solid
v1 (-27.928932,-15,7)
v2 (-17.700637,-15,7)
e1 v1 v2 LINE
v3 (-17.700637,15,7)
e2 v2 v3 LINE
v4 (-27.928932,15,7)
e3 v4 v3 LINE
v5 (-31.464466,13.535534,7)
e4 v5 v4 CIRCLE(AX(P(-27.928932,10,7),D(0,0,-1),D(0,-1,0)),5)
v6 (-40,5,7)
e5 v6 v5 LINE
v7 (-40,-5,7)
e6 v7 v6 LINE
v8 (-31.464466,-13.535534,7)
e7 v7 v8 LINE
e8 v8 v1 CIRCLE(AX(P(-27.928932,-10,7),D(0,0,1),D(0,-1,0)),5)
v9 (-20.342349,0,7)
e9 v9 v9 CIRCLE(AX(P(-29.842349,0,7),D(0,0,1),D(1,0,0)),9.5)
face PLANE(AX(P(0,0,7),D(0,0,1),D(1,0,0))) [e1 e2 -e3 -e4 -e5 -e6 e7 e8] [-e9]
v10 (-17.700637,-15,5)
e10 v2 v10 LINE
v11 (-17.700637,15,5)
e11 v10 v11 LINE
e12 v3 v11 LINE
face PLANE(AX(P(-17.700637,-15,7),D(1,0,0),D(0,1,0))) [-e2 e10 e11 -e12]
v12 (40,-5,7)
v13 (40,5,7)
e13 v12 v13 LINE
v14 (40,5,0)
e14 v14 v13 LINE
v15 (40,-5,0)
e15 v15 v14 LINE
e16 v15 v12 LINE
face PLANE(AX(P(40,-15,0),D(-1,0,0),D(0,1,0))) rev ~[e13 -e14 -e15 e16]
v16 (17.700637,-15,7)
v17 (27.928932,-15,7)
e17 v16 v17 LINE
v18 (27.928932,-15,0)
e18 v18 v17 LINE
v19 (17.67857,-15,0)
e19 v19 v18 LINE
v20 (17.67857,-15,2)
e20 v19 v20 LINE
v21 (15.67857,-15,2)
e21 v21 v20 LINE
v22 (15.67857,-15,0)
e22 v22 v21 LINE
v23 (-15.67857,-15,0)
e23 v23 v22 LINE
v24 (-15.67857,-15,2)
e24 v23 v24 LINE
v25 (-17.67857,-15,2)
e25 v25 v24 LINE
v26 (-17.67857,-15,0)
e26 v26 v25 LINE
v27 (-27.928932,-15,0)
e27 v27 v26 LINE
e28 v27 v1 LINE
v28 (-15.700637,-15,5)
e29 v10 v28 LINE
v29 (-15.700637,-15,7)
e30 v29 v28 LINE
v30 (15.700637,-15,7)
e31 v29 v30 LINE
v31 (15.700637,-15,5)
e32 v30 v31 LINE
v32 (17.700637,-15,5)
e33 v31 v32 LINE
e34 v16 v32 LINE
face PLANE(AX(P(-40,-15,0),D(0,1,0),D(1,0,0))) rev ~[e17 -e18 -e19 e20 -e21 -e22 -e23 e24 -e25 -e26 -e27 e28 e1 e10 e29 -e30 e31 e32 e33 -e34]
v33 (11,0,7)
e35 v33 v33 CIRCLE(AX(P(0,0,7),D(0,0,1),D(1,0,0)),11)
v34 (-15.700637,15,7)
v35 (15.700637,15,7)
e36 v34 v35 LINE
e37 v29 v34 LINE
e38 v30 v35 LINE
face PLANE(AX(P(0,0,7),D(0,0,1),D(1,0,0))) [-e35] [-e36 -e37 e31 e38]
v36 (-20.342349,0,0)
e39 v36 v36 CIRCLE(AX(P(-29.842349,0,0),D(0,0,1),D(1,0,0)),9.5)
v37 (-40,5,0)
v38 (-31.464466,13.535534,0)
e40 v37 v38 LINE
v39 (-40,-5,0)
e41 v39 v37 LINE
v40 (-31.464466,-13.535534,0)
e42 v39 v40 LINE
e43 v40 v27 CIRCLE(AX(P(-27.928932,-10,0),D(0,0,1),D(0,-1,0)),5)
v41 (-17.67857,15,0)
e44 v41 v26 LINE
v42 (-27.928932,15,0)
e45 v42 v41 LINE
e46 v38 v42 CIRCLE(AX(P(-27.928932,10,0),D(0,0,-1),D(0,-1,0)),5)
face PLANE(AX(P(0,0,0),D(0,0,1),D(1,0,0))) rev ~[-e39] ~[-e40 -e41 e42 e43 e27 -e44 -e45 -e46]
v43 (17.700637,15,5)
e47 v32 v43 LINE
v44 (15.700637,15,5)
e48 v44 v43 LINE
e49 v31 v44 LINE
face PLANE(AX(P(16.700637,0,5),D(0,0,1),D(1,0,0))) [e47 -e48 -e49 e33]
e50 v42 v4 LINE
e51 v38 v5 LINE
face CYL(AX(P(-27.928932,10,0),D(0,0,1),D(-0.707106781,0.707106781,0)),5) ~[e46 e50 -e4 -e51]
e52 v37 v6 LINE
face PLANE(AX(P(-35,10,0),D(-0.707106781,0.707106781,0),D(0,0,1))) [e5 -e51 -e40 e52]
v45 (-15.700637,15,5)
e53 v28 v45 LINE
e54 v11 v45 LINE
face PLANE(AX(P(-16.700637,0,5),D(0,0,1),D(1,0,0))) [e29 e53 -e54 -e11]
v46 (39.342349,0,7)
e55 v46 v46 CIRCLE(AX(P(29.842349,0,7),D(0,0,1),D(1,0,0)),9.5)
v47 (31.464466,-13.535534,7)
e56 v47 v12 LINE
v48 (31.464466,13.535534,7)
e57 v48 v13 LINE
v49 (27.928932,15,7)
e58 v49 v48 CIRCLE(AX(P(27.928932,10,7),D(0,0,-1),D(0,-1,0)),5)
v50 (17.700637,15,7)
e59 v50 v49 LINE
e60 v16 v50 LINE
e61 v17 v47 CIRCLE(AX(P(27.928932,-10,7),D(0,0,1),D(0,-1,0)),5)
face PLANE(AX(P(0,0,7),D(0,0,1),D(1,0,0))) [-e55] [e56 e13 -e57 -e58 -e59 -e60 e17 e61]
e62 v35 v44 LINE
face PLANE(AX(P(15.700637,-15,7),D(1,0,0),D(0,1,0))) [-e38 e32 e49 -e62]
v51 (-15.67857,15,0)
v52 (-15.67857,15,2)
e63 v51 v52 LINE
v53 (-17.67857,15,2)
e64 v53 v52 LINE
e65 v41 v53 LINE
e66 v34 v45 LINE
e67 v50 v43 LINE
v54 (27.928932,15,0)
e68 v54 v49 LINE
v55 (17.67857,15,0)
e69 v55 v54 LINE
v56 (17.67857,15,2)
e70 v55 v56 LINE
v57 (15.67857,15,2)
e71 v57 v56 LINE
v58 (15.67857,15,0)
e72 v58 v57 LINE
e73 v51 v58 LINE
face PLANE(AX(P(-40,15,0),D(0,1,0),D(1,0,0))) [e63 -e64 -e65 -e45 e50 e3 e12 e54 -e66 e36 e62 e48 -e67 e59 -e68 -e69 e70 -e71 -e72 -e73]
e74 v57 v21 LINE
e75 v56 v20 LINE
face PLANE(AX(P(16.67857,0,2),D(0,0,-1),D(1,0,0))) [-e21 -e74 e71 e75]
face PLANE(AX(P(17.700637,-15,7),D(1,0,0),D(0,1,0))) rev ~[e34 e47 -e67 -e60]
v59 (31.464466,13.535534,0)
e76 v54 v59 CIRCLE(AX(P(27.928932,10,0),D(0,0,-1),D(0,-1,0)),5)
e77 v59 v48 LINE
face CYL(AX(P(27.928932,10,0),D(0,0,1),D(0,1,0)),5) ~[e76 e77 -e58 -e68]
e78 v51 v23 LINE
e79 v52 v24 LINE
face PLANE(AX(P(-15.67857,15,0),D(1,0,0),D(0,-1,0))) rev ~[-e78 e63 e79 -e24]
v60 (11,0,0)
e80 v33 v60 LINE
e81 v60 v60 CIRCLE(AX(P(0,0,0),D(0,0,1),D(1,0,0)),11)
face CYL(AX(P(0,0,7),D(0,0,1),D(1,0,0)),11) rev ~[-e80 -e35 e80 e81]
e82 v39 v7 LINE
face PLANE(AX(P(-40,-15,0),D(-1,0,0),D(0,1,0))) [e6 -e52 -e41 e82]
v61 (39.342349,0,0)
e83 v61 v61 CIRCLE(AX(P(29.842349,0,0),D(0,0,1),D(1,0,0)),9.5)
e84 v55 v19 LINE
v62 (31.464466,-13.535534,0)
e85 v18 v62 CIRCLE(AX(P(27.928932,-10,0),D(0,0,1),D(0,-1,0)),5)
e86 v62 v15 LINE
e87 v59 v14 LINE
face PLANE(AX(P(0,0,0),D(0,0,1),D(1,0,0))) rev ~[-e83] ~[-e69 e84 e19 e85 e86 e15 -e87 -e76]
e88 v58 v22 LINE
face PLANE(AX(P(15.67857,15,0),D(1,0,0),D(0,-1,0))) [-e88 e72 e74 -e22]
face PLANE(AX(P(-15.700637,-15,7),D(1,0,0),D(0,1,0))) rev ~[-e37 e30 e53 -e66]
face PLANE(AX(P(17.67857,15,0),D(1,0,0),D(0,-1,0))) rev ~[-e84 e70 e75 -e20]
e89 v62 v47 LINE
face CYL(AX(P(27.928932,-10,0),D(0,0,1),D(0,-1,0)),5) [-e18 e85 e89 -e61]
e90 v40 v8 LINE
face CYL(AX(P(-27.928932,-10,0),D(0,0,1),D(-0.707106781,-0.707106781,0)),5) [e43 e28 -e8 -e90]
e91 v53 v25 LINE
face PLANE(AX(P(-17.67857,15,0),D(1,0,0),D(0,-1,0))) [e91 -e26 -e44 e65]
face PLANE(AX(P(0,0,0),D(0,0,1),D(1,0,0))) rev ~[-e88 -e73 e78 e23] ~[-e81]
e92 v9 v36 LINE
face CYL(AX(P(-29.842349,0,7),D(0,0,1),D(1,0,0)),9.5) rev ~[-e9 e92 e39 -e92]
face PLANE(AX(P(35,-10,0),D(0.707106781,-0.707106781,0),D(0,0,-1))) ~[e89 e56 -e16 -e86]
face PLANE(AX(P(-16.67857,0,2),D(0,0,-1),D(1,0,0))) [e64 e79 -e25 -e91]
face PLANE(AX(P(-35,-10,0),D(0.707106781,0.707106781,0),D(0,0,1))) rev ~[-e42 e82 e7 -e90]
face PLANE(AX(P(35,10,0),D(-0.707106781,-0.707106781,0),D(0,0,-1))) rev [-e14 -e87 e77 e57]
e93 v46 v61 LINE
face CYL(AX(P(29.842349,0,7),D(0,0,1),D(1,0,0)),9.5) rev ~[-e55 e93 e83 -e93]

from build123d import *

# Parameters (mm, degrees)
F0_W      = 80
F0_H      = 30
F1_DEPTH  = 7
F2_R      = 11
F3_DEPTH  = 7.001
F4_SIZE   = 10
F5_R      = 5
F6_R      = 9.5
F7_DEPTH  = 7.001
F8_W      = 2
F8_H      = 30
F9_DEPTH  = 2
F10_W     = 2
F10_H     = 30
F11_DEPTH = 2


with BuildPart() as f1:
    # F0 (on Top) → F1 (new body)
    with BuildSketch(Plane.XY):
        Rectangle(F0_W, F0_H)
    extrude(amount=F1_DEPTH)

    # F2 (on face) → F3 (cut, through all)
    with BuildSketch(Plane.XY.offset(7)):
        Circle(F2_R)
    extrude(amount=-F3_DEPTH, mode=Mode.SUBTRACT)

    # F4
    f4_edges = [f1.edges().sort_by_distance(p)[0] for p in [
        (-40, 15, 3.5),
        (40, -15, 3.5),
        (40, 15, 3.5),
        (-40, -15, 3.5),
    ]]
    chamfer(f4_edges, length=F4_SIZE)

    # F5
    f5_edges = [f1.edges().sort_by_distance(p)[0] for p in [
        (-30, 15, 3.5),
        (-30, -15, 3.5),
        (30, -15, 3.5),
        (30, 15, 3.5),
    ]]
    fillet(f5_edges, radius=F5_R)

    # F6 (on face) → F7 (cut, through all)
    with BuildSketch(Plane.XY.offset(7)):
        with Locations((29.84234935, 0)):
            Circle(F6_R)
        with Locations((-29.84234935, 0)):
            Circle(F6_R)
    extrude(amount=-F7_DEPTH, mode=Mode.SUBTRACT)

    # F8 (on face) → F9 (cut)
    with BuildSketch(Plane.XY.offset(7)):
        with Locations((16.7006367594, 0)):
            Rectangle(F8_W, F8_H)
        with Locations((-16.7006367594, 0)):
            Rectangle(F8_W, F8_H)
    extrude(amount=-F9_DEPTH, mode=Mode.SUBTRACT)

    # F10 (on face) → F11 (cut)
    with BuildSketch(Plane(origin=(0, 0, 0), x_dir=(1, 0, 0), z_dir=(0, 0, -1))):
        with Locations((16.6785700023, 0)):
            Rectangle(F10_W, F10_H)
        with Locations((-16.6785700023, 0)):
            Rectangle(F10_W, F10_H)
    extrude(amount=-F11_DEPTH, mode=Mode.SUBTRACT)


solid = f1.part
